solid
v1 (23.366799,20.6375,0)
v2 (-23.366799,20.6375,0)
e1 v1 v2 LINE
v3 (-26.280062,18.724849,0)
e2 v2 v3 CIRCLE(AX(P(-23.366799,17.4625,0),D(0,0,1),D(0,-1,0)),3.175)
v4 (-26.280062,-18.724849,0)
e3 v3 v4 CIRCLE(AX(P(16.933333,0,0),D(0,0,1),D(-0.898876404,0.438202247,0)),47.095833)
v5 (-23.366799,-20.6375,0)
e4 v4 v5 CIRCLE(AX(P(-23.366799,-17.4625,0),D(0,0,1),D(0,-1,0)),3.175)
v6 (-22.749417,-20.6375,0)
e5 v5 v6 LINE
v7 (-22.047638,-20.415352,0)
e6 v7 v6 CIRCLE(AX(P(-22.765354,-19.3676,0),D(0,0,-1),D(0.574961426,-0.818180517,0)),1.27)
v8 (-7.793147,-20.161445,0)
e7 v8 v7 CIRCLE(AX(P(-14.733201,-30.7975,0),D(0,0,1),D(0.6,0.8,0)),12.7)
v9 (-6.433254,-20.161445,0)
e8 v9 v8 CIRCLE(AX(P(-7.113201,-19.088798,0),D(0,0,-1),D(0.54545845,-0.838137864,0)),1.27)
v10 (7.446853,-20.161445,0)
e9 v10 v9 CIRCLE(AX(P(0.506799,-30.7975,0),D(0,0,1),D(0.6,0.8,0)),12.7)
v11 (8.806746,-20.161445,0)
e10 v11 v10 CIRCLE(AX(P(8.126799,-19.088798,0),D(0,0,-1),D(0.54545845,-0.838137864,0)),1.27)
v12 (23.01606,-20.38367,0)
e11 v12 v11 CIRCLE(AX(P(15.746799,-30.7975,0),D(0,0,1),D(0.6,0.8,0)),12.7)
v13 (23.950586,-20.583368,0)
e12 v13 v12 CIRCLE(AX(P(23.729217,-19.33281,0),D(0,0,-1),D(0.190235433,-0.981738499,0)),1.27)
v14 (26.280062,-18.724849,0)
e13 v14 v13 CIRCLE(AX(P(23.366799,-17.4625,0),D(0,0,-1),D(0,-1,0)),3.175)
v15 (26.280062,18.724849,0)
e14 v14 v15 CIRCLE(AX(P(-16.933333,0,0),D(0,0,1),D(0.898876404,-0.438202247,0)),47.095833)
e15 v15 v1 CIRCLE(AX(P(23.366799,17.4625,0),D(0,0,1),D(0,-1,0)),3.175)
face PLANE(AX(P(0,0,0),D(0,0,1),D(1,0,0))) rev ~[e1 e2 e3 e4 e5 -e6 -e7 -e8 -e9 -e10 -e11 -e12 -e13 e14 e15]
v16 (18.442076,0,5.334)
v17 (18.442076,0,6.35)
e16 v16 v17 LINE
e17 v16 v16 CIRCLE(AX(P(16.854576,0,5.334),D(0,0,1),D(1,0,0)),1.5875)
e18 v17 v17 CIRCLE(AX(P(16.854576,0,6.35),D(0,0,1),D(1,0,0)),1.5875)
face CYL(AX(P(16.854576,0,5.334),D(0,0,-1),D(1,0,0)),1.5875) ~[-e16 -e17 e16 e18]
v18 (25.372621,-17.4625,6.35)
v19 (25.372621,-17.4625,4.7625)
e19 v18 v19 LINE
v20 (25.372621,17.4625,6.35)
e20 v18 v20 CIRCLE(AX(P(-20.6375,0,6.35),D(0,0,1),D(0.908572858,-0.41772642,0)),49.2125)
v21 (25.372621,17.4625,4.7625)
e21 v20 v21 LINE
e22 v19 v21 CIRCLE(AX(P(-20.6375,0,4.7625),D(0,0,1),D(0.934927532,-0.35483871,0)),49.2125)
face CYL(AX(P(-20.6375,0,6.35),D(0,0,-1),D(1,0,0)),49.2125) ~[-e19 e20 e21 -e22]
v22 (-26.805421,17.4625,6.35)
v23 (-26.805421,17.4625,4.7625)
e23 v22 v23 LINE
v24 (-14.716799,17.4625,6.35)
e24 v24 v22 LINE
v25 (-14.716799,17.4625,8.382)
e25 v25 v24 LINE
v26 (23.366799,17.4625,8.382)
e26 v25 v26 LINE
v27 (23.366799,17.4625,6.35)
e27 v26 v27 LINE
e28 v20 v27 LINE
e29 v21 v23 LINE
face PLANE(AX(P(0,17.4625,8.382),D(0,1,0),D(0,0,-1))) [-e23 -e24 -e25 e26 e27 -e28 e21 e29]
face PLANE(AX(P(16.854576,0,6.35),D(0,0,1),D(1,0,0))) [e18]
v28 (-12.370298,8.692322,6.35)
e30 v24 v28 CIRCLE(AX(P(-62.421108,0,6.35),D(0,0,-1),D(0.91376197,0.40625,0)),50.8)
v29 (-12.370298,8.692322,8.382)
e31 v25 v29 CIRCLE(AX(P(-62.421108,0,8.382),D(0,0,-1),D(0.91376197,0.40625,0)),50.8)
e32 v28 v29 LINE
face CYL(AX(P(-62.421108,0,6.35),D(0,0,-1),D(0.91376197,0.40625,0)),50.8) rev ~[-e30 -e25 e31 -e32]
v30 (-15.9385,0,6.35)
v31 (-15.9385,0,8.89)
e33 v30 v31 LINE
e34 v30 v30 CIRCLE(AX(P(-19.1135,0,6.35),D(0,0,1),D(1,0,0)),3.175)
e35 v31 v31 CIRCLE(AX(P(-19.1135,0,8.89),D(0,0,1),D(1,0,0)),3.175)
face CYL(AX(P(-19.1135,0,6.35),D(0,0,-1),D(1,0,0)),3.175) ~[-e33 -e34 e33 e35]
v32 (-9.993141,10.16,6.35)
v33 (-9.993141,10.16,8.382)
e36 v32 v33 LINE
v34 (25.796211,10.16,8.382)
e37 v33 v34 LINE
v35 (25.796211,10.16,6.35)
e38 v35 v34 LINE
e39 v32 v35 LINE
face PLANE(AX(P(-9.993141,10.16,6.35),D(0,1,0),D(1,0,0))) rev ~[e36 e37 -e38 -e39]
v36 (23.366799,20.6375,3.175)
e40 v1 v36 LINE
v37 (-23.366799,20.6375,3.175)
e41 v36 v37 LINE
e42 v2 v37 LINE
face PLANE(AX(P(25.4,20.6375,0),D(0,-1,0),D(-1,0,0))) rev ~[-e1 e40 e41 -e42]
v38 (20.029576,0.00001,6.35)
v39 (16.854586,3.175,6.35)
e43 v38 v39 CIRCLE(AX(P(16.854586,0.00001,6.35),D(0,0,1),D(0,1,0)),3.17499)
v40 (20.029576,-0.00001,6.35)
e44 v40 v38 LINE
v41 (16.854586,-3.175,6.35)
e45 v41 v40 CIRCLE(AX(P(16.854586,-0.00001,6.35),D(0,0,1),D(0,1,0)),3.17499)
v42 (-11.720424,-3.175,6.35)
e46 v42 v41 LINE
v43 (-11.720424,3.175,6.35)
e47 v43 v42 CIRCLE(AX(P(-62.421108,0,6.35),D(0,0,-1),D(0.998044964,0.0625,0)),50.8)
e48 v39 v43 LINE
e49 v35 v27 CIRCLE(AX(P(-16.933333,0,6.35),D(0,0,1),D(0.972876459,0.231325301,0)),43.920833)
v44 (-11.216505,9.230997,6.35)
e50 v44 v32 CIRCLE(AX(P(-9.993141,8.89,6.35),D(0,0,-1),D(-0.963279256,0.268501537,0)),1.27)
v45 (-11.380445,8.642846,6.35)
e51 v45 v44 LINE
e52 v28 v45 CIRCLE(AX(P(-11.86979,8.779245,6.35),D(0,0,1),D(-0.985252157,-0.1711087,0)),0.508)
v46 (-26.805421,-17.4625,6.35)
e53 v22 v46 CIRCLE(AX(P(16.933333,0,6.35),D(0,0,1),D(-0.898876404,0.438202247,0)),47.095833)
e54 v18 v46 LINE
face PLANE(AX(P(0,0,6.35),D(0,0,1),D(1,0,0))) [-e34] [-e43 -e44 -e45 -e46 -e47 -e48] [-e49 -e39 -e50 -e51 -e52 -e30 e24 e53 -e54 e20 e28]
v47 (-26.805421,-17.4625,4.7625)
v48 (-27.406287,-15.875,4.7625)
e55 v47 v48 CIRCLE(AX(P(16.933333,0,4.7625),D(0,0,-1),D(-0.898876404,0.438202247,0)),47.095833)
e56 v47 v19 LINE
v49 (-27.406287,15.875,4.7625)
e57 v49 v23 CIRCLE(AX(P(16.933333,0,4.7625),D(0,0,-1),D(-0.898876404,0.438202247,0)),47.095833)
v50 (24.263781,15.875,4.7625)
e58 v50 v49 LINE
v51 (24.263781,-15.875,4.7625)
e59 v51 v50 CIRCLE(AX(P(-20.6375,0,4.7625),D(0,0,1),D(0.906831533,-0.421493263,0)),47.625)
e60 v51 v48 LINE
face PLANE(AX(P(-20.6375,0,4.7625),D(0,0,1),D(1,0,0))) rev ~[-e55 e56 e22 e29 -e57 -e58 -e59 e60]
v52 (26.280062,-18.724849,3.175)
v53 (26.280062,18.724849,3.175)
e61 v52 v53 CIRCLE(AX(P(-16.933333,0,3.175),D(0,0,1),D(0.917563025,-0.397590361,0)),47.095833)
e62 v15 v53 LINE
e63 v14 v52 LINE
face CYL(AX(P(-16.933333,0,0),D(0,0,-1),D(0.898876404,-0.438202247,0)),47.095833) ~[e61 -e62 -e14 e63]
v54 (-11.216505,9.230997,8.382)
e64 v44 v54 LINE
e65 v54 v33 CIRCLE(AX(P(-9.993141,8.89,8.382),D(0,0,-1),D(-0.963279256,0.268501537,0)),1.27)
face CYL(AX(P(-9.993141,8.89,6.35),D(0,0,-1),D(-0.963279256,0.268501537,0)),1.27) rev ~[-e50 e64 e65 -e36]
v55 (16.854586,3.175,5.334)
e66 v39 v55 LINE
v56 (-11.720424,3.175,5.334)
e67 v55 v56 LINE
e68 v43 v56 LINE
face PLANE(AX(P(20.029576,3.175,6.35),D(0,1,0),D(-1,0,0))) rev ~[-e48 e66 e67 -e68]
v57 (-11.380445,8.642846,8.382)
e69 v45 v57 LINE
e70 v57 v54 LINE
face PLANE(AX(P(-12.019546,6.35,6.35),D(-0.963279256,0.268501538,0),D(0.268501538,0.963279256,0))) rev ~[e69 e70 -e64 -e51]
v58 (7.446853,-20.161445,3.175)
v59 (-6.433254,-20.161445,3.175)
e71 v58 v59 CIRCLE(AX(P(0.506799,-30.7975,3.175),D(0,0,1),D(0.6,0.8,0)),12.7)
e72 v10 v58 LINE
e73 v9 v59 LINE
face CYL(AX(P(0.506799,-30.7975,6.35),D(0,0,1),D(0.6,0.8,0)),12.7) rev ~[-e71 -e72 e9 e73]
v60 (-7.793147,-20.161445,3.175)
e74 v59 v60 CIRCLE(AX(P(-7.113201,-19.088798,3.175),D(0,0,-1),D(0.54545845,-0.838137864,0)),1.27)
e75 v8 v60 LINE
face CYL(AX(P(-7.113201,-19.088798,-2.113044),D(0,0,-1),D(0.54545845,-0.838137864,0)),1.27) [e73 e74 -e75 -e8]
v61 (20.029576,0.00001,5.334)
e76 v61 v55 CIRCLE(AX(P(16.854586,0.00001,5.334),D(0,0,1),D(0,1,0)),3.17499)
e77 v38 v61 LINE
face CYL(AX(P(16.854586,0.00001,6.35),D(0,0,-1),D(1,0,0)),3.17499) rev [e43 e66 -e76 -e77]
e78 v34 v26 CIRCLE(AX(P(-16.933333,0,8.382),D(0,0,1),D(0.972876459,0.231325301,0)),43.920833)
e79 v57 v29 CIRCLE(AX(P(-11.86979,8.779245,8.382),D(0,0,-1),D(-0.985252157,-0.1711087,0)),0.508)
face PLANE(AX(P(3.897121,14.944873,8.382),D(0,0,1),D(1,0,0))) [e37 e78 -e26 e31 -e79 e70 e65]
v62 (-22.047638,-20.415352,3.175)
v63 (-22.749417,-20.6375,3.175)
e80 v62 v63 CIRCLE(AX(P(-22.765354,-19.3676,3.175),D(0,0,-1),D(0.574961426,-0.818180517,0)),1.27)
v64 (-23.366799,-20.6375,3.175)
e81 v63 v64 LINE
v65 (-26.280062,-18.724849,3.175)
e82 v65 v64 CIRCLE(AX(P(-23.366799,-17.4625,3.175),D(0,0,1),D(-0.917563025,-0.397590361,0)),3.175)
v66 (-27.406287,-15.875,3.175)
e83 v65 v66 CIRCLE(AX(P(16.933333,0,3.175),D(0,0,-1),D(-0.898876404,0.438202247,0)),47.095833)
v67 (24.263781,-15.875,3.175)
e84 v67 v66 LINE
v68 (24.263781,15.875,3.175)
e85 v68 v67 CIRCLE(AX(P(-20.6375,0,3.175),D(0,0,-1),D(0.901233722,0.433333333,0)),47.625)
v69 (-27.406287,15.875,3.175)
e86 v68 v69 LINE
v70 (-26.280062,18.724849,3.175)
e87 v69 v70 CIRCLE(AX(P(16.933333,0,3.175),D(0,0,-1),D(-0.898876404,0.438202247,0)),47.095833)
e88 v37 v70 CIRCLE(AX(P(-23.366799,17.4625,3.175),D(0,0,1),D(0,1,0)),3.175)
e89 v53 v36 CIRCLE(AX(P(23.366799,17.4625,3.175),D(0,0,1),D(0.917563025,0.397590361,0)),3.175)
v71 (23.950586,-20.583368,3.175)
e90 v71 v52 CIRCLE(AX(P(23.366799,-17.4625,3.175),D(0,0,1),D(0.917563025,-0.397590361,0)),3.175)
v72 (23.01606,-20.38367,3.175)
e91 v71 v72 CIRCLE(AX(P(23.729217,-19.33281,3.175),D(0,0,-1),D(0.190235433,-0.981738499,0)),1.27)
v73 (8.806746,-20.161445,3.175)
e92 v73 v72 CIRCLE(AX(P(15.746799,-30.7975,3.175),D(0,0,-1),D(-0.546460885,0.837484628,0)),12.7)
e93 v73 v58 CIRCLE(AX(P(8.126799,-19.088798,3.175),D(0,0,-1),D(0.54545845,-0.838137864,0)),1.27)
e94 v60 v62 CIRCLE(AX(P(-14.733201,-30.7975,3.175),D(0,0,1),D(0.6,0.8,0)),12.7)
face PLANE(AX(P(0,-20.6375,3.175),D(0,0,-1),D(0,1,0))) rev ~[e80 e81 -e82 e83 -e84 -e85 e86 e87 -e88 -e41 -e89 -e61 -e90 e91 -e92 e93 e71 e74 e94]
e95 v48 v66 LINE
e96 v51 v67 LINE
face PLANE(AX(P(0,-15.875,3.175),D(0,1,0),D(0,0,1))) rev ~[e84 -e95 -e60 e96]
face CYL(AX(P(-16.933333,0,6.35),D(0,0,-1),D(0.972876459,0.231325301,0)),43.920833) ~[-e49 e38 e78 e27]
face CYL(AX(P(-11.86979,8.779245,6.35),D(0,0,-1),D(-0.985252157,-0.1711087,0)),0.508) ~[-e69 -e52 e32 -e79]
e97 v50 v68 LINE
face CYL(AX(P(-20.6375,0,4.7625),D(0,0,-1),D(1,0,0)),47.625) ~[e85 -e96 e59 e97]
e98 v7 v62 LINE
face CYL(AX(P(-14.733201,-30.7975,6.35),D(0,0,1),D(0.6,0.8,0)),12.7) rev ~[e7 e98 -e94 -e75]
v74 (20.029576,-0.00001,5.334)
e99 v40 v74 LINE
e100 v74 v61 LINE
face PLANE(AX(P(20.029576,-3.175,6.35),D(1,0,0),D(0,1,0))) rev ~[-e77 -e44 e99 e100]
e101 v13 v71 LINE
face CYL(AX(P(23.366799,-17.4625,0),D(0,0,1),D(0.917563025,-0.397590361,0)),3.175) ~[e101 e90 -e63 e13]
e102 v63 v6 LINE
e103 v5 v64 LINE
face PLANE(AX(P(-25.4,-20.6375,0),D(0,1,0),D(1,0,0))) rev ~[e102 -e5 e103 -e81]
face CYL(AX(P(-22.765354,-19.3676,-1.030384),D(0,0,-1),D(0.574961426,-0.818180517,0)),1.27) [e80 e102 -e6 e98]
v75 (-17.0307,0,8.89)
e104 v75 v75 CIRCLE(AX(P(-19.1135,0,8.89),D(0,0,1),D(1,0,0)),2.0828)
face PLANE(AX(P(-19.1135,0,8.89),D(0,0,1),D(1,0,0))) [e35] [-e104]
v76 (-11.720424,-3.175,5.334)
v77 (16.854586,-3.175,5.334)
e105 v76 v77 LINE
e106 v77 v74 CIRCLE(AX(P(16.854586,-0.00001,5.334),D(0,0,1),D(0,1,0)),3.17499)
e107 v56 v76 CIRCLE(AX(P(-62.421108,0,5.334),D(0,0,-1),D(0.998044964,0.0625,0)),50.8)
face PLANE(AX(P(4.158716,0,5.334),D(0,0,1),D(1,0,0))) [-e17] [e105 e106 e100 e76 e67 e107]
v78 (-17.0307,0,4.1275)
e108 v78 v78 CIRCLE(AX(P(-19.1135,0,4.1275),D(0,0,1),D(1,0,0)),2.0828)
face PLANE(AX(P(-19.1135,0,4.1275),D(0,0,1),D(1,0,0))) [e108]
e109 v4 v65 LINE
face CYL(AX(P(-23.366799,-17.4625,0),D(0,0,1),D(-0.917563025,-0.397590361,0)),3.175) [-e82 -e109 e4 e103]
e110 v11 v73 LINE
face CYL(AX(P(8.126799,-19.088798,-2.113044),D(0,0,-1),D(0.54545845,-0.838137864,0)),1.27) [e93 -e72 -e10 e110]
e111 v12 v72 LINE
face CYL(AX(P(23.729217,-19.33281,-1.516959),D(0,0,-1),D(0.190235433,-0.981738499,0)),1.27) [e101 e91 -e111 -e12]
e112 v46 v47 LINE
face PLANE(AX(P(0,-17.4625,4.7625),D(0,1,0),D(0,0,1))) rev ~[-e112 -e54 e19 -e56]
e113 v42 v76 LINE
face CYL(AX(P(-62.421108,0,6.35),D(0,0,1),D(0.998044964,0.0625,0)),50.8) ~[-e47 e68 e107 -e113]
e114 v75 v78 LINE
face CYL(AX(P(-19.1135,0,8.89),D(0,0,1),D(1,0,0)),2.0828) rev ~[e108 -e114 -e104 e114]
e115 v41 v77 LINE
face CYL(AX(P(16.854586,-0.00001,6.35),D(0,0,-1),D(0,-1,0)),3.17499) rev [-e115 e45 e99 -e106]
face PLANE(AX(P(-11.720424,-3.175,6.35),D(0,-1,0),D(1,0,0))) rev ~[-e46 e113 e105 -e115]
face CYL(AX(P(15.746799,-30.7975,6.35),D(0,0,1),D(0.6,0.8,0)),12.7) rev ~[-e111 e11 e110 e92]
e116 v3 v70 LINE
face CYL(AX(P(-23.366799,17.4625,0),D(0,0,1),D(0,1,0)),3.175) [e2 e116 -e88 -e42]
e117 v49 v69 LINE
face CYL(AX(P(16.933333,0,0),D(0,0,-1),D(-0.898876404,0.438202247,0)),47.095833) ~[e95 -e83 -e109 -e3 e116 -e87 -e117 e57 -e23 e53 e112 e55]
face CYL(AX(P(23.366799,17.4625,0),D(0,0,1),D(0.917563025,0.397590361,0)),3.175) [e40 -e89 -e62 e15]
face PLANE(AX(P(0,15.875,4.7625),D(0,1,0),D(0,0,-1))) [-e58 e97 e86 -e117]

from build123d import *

# Parameters (mm, degrees)
F1_DEPTH     = 6.35
F2_R         = 3.175
F3_R         = 3.175
F4_DEPTH     = 2.54
F6_DEPTH     = 2.032
F7_T1_DEPTH  = 7.9826274972
F8_R         = 3.175
F9_R         = 2.0828
F10_DEPTH    = 4.7625
F12_DEPTH    = 1.016
F13_R        = 3.17499
F14_R        = 1.5875
F15_DEPTH    = 1.016
F19_DEPTH    = 6.351
F20_T1_DEPTH = 9.3839178422
F20_T3_DEPTH = 10.5760872304
F20_T5_DEPTH = 8.4107682306
F25_DEPTH    = 63.5


# Not quite as in the source:
# - a fillet or chamfer that OpenCascade refuses, or shapes differently, is made with other operations: its cross-section is extruded or revolved along the edge and cut away or added
# - a fillet or chamfer is up to 0.001 mm smaller than in the source, because OpenCascade refuses the exact size
# - a feature of the source that left no trace in its solid (it failed there, or was rolled back) is left out


with BuildPart() as f1:
    # F0 (on Top) → F1 (new body)
    with BuildSketch(Plane.XY):
        with BuildLine():
            ThreePointArc((25.4, -20.6375), (30.1625, 0), (25.4, 20.6375))
            Line((25.4, 20.6375), (-25.4, 20.6375))
            ThreePointArc((-25.4, 20.6375), (-30.1625, 0), (-25.4, -20.6375))
            Line((-25.4, -20.6375), (25.4, -20.6375))
        make_face()
    extrude(amount=F1_DEPTH)

    # F2
    f2_edges = [f1.edges().sort_by_distance(p)[0] for p in [
        (-25.4, 20.6375, 3.175),
        (-25.4, -20.6375, 3.175),
        (25.4, -20.6375, 3.175),
        (25.4, 20.6375, 3.175),
    ]]
    fillet(f2_edges, radius=F2_R)

    # F3 (on face) → F4 (join)
    with BuildSketch(Plane.XY.offset(6.35)):
        with Locations((-19.1135, 0)):
            Circle(F3_R)
    extrude(amount=F4_DEPTH)

    # F5 (on face) → F6 (join)
    with BuildSketch(Plane.XY.offset(6.35)):
        with BuildLine():
            ThreePointArc((25.7962114887, 10.16), (24.151933107, 15.5254784859), (21.8369283945, 20.6375))
            Line((21.8369283945, 20.6375), (-16.002, 20.6375))
            ThreePointArc((-16.002, 20.6375), (-13.4865218815, 13.6398781095), (-12.0195455914, 6.35))
            Line((-12.0195455914, 6.35), (-11.2165052403, 9.2309969527))
            ThreePointArc((-11.2165052403, 9.2309969527), (-10.7612010879, 9.9014262529), (-9.9931405857, 10.16))
            Line((-9.9931405857, 10.16), (25.7962114887, 10.16))
        make_face()
    extrude(amount=F6_DEPTH)

    # F7: fillet of radius 0.508 on 1 edges, made by hand

    # F7_s2 → F7_t1 (cut)
    with BuildSketch(Plane.XY.offset(6.35)):
        with BuildLine():
            ThreePointArc((-12.3702984959, 8.6923219718), (-11.8951499479, 8.2718785653), (-11.3804445383, 8.6428464104))
            Line((-11.3804445383, 8.6428464104), (-12.0195455914, 6.35))
            ThreePointArc((-12.0195455914, 6.35), (-12.1812694874, 7.523205399), (-12.3702984959, 8.6923219718))
        make_face()
    extrude(amount=F7_T1_DEPTH, mode=Mode.SUBTRACT)

    # F8
    f8_edges = [f1.edges().sort_by_distance(p)[0] for p in [
        (21.836928, 20.6375, 7.366),
    ]]
    fillet(f8_edges, radius=F8_R)

    # F9 (on face) → F10 (cut)
    with BuildSketch(Plane.XY.offset(8.89)):
        with Locations((-19.1135, 0)):
            Circle(F9_R)
    extrude(amount=-F10_DEPTH, mode=Mode.SUBTRACT)

    # F11 (on face) → F12 (cut)
    with BuildSketch(Plane.XY.offset(6.35)):
        with BuildLine():
            ThreePointArc((-11.7204239002, 3.175), (-11.6211080672, 0), (-11.7204239002, -3.175))
            Line((-11.7204239002, -3.175), (20.0295760998, -3.175))
            Line((20.0295760998, -3.175), (20.0295760998, 3.175))
            Line((20.0295760998, 3.175), (-11.7204239002, 3.175))
        make_face()
    extrude(amount=-F12_DEPTH, mode=Mode.SUBTRACT)

    # F13 (radius 3.175 in the source; OpenCascade refuses exactly that, so slightly less here)
    f13_edges = [f1.edges().sort_by_distance(p)[0] for p in [
        (20.029576, 3.175, 5.842),
        (20.029576, -3.175, 5.842),
    ]]
    fillet(f13_edges, radius=F13_R)

    # F14 (on face) → F15 (join, through all)
    with BuildSketch(Plane.XY.offset(5.334)):
        with Locations((16.8545760998, 0)):
            Circle(F14_R)
    extrude(amount=F15_DEPTH)

    # F18 (on face) → F19 (cut, through all)
    with BuildSketch(Plane.XY.offset(6.35)):
        with BuildLine():
            Line((8.1267993519, -20.6375), (23.3667993519, -20.6375))
            ThreePointArc((23.3667993519, -20.6375), (15.7467993519, -18.0975), (8.1267993519, -20.6375))
        make_face()
        with BuildLine():
            Line((-7.1132006481, -20.6375), (8.1267993519, -20.6375))
            ThreePointArc((8.1267993519, -20.6375), (0.5067993519, -18.0975), (-7.1132006481, -20.6375))
        make_face()
        with BuildLine():
            Line((-22.3532006481, -20.6375), (-7.1132006481, -20.6375))
            ThreePointArc((-7.1132006481, -20.6375), (-14.7332006481, -18.0975), (-22.3532006481, -20.6375))
        make_face()
    extrude(amount=-F19_DEPTH, mode=Mode.SUBTRACT)

    # F20: fillet of radius 1.27 on 4 edges, made by hand

    # F20_s2 → F20_t1 (cut)
    with BuildSketch(Plane.XY.offset(-1.5169589211)):
        with BuildLine():
            ThreePointArc((23.9708158767, -20.5796179073), (23.4664541239, -20.5753299276), (23.0035373612, -20.3750620187))
            Line((23.0035373612, -20.3750620187), (22.9890237709, -20.3959070588))
            ThreePointArc((22.9890237709, -20.3959070588), (23.1714765643, -20.5252240374), (23.3515593519, -20.65782))
            Line((23.3515593519, -20.65782), (23.3667993519, -20.6629))
            ThreePointArc((23.3667993519, -20.6629), (23.6726182662, -20.648255005), (23.9756478567, -20.6045540651))
            Line((23.9756478567, -20.6045540651), (23.9708158767, -20.5796179073))
        make_face()
    extrude(amount=F20_T1_DEPTH, mode=Mode.SUBTRACT)

    # F20_s4 → F20_t3 (cut)
    with BuildSketch(Plane.XY.offset(-2.1130436152)):
        with BuildLine():
            ThreePointArc((8.8195315833, -20.1532329387), (8.1267993519, -20.3587978512), (7.4340671204, -20.1532329387))
            Line((7.4340671204, -20.1532329387), (7.4202124758, -20.1745216404))
            ThreePointArc((7.4202124758, -20.1745216404), (7.7699369678, -20.410377341), (8.1115593519, -20.65782))
            Line((8.1115593519, -20.65782), (8.1420393519, -20.65782))
            ThreePointArc((8.1420393519, -20.65782), (8.4836617359, -20.410377341), (8.8333862279, -20.1745216404))
            Line((8.8333862279, -20.1745216404), (8.8195315833, -20.1532329387))
        make_face()
        with BuildLine():
            ThreePointArc((-6.4204684167, -20.1532329387), (-7.1132006481, -20.3587978512), (-7.8059328796, -20.1532329387))
            Line((-7.8059328796, -20.1532329387), (-7.8197875242, -20.1745216404))
            ThreePointArc((-7.8197875242, -20.1745216404), (-7.4700630322, -20.410377341), (-7.1284406481, -20.65782))
            Line((-7.1284406481, -20.65782), (-7.0979606481, -20.65782))
            ThreePointArc((-7.0979606481, -20.65782), (-6.7563382641, -20.410377341), (-6.4066137721, -20.1745216404))
            Line((-6.4066137721, -20.1745216404), (-6.4204684167, -20.1532329387))
        make_face()
    extrude(amount=F20_T3_DEPTH, mode=Mode.SUBTRACT)

    # F20_s6 → F20_t5 (cut)
    with BuildSketch(Plane.XY.offset(-1.0303841153)):
        with BuildLine():
            ThreePointArc((-22.0351532703, -20.4066892562), (-22.382433504, -20.5784970549), (-22.7653542821, -20.6376))
            Line((-22.7653542821, -20.6376), (-22.7653542821, -20.663))
            ThreePointArc((-22.7653542821, -20.663), (-22.5592774651, -20.6629), (-22.3532006481, -20.6629))
            Line((-22.3532006481, -20.6629), (-22.3379606481, -20.65782))
            ThreePointArc((-22.3379606481, -20.65782), (-22.1801756491, -20.5413775117), (-22.0205492501, -20.4274710413))
            Line((-22.0205492501, -20.4274710413), (-22.0351532703, -20.4066892562))
        make_face()
    extrude(amount=F20_T5_DEPTH, mode=Mode.SUBTRACT)

    # F21 (on Front) → F23 (revolve, cut)
    with BuildSketch(Plane.XZ):
        Polygon((26.9875, 4.7625), (26.9875, 3.175), (30.1625, 3.175), (30.1625, 6.35), (28.575, 6.35), (28.575, 4.7625), align=None)
    revolve(axis=Axis((-20.6375, 0, 8.7874885648), (0, 0, 1)), mode=Mode.SUBTRACT)

    # F24 (on Right) → F25 (cut, symmetric)
    with BuildSketch(Plane.YZ):
        Polygon((15.875, 3.175), (20.6375, 3.175), (20.6375, 8.382), (17.4625, 8.382), (17.4625, 4.7625), (15.875, 4.7625), align=None)
        Polygon((-15.875, 4.7625), (-17.4625, 4.7625), (-17.4625, 8.382), (-20.6375, 8.382), (-20.6375, 3.175), (-15.875, 3.175), align=None)
    extrude(amount=F25_DEPTH, both=True, mode=Mode.SUBTRACT)


solid = f1.part
